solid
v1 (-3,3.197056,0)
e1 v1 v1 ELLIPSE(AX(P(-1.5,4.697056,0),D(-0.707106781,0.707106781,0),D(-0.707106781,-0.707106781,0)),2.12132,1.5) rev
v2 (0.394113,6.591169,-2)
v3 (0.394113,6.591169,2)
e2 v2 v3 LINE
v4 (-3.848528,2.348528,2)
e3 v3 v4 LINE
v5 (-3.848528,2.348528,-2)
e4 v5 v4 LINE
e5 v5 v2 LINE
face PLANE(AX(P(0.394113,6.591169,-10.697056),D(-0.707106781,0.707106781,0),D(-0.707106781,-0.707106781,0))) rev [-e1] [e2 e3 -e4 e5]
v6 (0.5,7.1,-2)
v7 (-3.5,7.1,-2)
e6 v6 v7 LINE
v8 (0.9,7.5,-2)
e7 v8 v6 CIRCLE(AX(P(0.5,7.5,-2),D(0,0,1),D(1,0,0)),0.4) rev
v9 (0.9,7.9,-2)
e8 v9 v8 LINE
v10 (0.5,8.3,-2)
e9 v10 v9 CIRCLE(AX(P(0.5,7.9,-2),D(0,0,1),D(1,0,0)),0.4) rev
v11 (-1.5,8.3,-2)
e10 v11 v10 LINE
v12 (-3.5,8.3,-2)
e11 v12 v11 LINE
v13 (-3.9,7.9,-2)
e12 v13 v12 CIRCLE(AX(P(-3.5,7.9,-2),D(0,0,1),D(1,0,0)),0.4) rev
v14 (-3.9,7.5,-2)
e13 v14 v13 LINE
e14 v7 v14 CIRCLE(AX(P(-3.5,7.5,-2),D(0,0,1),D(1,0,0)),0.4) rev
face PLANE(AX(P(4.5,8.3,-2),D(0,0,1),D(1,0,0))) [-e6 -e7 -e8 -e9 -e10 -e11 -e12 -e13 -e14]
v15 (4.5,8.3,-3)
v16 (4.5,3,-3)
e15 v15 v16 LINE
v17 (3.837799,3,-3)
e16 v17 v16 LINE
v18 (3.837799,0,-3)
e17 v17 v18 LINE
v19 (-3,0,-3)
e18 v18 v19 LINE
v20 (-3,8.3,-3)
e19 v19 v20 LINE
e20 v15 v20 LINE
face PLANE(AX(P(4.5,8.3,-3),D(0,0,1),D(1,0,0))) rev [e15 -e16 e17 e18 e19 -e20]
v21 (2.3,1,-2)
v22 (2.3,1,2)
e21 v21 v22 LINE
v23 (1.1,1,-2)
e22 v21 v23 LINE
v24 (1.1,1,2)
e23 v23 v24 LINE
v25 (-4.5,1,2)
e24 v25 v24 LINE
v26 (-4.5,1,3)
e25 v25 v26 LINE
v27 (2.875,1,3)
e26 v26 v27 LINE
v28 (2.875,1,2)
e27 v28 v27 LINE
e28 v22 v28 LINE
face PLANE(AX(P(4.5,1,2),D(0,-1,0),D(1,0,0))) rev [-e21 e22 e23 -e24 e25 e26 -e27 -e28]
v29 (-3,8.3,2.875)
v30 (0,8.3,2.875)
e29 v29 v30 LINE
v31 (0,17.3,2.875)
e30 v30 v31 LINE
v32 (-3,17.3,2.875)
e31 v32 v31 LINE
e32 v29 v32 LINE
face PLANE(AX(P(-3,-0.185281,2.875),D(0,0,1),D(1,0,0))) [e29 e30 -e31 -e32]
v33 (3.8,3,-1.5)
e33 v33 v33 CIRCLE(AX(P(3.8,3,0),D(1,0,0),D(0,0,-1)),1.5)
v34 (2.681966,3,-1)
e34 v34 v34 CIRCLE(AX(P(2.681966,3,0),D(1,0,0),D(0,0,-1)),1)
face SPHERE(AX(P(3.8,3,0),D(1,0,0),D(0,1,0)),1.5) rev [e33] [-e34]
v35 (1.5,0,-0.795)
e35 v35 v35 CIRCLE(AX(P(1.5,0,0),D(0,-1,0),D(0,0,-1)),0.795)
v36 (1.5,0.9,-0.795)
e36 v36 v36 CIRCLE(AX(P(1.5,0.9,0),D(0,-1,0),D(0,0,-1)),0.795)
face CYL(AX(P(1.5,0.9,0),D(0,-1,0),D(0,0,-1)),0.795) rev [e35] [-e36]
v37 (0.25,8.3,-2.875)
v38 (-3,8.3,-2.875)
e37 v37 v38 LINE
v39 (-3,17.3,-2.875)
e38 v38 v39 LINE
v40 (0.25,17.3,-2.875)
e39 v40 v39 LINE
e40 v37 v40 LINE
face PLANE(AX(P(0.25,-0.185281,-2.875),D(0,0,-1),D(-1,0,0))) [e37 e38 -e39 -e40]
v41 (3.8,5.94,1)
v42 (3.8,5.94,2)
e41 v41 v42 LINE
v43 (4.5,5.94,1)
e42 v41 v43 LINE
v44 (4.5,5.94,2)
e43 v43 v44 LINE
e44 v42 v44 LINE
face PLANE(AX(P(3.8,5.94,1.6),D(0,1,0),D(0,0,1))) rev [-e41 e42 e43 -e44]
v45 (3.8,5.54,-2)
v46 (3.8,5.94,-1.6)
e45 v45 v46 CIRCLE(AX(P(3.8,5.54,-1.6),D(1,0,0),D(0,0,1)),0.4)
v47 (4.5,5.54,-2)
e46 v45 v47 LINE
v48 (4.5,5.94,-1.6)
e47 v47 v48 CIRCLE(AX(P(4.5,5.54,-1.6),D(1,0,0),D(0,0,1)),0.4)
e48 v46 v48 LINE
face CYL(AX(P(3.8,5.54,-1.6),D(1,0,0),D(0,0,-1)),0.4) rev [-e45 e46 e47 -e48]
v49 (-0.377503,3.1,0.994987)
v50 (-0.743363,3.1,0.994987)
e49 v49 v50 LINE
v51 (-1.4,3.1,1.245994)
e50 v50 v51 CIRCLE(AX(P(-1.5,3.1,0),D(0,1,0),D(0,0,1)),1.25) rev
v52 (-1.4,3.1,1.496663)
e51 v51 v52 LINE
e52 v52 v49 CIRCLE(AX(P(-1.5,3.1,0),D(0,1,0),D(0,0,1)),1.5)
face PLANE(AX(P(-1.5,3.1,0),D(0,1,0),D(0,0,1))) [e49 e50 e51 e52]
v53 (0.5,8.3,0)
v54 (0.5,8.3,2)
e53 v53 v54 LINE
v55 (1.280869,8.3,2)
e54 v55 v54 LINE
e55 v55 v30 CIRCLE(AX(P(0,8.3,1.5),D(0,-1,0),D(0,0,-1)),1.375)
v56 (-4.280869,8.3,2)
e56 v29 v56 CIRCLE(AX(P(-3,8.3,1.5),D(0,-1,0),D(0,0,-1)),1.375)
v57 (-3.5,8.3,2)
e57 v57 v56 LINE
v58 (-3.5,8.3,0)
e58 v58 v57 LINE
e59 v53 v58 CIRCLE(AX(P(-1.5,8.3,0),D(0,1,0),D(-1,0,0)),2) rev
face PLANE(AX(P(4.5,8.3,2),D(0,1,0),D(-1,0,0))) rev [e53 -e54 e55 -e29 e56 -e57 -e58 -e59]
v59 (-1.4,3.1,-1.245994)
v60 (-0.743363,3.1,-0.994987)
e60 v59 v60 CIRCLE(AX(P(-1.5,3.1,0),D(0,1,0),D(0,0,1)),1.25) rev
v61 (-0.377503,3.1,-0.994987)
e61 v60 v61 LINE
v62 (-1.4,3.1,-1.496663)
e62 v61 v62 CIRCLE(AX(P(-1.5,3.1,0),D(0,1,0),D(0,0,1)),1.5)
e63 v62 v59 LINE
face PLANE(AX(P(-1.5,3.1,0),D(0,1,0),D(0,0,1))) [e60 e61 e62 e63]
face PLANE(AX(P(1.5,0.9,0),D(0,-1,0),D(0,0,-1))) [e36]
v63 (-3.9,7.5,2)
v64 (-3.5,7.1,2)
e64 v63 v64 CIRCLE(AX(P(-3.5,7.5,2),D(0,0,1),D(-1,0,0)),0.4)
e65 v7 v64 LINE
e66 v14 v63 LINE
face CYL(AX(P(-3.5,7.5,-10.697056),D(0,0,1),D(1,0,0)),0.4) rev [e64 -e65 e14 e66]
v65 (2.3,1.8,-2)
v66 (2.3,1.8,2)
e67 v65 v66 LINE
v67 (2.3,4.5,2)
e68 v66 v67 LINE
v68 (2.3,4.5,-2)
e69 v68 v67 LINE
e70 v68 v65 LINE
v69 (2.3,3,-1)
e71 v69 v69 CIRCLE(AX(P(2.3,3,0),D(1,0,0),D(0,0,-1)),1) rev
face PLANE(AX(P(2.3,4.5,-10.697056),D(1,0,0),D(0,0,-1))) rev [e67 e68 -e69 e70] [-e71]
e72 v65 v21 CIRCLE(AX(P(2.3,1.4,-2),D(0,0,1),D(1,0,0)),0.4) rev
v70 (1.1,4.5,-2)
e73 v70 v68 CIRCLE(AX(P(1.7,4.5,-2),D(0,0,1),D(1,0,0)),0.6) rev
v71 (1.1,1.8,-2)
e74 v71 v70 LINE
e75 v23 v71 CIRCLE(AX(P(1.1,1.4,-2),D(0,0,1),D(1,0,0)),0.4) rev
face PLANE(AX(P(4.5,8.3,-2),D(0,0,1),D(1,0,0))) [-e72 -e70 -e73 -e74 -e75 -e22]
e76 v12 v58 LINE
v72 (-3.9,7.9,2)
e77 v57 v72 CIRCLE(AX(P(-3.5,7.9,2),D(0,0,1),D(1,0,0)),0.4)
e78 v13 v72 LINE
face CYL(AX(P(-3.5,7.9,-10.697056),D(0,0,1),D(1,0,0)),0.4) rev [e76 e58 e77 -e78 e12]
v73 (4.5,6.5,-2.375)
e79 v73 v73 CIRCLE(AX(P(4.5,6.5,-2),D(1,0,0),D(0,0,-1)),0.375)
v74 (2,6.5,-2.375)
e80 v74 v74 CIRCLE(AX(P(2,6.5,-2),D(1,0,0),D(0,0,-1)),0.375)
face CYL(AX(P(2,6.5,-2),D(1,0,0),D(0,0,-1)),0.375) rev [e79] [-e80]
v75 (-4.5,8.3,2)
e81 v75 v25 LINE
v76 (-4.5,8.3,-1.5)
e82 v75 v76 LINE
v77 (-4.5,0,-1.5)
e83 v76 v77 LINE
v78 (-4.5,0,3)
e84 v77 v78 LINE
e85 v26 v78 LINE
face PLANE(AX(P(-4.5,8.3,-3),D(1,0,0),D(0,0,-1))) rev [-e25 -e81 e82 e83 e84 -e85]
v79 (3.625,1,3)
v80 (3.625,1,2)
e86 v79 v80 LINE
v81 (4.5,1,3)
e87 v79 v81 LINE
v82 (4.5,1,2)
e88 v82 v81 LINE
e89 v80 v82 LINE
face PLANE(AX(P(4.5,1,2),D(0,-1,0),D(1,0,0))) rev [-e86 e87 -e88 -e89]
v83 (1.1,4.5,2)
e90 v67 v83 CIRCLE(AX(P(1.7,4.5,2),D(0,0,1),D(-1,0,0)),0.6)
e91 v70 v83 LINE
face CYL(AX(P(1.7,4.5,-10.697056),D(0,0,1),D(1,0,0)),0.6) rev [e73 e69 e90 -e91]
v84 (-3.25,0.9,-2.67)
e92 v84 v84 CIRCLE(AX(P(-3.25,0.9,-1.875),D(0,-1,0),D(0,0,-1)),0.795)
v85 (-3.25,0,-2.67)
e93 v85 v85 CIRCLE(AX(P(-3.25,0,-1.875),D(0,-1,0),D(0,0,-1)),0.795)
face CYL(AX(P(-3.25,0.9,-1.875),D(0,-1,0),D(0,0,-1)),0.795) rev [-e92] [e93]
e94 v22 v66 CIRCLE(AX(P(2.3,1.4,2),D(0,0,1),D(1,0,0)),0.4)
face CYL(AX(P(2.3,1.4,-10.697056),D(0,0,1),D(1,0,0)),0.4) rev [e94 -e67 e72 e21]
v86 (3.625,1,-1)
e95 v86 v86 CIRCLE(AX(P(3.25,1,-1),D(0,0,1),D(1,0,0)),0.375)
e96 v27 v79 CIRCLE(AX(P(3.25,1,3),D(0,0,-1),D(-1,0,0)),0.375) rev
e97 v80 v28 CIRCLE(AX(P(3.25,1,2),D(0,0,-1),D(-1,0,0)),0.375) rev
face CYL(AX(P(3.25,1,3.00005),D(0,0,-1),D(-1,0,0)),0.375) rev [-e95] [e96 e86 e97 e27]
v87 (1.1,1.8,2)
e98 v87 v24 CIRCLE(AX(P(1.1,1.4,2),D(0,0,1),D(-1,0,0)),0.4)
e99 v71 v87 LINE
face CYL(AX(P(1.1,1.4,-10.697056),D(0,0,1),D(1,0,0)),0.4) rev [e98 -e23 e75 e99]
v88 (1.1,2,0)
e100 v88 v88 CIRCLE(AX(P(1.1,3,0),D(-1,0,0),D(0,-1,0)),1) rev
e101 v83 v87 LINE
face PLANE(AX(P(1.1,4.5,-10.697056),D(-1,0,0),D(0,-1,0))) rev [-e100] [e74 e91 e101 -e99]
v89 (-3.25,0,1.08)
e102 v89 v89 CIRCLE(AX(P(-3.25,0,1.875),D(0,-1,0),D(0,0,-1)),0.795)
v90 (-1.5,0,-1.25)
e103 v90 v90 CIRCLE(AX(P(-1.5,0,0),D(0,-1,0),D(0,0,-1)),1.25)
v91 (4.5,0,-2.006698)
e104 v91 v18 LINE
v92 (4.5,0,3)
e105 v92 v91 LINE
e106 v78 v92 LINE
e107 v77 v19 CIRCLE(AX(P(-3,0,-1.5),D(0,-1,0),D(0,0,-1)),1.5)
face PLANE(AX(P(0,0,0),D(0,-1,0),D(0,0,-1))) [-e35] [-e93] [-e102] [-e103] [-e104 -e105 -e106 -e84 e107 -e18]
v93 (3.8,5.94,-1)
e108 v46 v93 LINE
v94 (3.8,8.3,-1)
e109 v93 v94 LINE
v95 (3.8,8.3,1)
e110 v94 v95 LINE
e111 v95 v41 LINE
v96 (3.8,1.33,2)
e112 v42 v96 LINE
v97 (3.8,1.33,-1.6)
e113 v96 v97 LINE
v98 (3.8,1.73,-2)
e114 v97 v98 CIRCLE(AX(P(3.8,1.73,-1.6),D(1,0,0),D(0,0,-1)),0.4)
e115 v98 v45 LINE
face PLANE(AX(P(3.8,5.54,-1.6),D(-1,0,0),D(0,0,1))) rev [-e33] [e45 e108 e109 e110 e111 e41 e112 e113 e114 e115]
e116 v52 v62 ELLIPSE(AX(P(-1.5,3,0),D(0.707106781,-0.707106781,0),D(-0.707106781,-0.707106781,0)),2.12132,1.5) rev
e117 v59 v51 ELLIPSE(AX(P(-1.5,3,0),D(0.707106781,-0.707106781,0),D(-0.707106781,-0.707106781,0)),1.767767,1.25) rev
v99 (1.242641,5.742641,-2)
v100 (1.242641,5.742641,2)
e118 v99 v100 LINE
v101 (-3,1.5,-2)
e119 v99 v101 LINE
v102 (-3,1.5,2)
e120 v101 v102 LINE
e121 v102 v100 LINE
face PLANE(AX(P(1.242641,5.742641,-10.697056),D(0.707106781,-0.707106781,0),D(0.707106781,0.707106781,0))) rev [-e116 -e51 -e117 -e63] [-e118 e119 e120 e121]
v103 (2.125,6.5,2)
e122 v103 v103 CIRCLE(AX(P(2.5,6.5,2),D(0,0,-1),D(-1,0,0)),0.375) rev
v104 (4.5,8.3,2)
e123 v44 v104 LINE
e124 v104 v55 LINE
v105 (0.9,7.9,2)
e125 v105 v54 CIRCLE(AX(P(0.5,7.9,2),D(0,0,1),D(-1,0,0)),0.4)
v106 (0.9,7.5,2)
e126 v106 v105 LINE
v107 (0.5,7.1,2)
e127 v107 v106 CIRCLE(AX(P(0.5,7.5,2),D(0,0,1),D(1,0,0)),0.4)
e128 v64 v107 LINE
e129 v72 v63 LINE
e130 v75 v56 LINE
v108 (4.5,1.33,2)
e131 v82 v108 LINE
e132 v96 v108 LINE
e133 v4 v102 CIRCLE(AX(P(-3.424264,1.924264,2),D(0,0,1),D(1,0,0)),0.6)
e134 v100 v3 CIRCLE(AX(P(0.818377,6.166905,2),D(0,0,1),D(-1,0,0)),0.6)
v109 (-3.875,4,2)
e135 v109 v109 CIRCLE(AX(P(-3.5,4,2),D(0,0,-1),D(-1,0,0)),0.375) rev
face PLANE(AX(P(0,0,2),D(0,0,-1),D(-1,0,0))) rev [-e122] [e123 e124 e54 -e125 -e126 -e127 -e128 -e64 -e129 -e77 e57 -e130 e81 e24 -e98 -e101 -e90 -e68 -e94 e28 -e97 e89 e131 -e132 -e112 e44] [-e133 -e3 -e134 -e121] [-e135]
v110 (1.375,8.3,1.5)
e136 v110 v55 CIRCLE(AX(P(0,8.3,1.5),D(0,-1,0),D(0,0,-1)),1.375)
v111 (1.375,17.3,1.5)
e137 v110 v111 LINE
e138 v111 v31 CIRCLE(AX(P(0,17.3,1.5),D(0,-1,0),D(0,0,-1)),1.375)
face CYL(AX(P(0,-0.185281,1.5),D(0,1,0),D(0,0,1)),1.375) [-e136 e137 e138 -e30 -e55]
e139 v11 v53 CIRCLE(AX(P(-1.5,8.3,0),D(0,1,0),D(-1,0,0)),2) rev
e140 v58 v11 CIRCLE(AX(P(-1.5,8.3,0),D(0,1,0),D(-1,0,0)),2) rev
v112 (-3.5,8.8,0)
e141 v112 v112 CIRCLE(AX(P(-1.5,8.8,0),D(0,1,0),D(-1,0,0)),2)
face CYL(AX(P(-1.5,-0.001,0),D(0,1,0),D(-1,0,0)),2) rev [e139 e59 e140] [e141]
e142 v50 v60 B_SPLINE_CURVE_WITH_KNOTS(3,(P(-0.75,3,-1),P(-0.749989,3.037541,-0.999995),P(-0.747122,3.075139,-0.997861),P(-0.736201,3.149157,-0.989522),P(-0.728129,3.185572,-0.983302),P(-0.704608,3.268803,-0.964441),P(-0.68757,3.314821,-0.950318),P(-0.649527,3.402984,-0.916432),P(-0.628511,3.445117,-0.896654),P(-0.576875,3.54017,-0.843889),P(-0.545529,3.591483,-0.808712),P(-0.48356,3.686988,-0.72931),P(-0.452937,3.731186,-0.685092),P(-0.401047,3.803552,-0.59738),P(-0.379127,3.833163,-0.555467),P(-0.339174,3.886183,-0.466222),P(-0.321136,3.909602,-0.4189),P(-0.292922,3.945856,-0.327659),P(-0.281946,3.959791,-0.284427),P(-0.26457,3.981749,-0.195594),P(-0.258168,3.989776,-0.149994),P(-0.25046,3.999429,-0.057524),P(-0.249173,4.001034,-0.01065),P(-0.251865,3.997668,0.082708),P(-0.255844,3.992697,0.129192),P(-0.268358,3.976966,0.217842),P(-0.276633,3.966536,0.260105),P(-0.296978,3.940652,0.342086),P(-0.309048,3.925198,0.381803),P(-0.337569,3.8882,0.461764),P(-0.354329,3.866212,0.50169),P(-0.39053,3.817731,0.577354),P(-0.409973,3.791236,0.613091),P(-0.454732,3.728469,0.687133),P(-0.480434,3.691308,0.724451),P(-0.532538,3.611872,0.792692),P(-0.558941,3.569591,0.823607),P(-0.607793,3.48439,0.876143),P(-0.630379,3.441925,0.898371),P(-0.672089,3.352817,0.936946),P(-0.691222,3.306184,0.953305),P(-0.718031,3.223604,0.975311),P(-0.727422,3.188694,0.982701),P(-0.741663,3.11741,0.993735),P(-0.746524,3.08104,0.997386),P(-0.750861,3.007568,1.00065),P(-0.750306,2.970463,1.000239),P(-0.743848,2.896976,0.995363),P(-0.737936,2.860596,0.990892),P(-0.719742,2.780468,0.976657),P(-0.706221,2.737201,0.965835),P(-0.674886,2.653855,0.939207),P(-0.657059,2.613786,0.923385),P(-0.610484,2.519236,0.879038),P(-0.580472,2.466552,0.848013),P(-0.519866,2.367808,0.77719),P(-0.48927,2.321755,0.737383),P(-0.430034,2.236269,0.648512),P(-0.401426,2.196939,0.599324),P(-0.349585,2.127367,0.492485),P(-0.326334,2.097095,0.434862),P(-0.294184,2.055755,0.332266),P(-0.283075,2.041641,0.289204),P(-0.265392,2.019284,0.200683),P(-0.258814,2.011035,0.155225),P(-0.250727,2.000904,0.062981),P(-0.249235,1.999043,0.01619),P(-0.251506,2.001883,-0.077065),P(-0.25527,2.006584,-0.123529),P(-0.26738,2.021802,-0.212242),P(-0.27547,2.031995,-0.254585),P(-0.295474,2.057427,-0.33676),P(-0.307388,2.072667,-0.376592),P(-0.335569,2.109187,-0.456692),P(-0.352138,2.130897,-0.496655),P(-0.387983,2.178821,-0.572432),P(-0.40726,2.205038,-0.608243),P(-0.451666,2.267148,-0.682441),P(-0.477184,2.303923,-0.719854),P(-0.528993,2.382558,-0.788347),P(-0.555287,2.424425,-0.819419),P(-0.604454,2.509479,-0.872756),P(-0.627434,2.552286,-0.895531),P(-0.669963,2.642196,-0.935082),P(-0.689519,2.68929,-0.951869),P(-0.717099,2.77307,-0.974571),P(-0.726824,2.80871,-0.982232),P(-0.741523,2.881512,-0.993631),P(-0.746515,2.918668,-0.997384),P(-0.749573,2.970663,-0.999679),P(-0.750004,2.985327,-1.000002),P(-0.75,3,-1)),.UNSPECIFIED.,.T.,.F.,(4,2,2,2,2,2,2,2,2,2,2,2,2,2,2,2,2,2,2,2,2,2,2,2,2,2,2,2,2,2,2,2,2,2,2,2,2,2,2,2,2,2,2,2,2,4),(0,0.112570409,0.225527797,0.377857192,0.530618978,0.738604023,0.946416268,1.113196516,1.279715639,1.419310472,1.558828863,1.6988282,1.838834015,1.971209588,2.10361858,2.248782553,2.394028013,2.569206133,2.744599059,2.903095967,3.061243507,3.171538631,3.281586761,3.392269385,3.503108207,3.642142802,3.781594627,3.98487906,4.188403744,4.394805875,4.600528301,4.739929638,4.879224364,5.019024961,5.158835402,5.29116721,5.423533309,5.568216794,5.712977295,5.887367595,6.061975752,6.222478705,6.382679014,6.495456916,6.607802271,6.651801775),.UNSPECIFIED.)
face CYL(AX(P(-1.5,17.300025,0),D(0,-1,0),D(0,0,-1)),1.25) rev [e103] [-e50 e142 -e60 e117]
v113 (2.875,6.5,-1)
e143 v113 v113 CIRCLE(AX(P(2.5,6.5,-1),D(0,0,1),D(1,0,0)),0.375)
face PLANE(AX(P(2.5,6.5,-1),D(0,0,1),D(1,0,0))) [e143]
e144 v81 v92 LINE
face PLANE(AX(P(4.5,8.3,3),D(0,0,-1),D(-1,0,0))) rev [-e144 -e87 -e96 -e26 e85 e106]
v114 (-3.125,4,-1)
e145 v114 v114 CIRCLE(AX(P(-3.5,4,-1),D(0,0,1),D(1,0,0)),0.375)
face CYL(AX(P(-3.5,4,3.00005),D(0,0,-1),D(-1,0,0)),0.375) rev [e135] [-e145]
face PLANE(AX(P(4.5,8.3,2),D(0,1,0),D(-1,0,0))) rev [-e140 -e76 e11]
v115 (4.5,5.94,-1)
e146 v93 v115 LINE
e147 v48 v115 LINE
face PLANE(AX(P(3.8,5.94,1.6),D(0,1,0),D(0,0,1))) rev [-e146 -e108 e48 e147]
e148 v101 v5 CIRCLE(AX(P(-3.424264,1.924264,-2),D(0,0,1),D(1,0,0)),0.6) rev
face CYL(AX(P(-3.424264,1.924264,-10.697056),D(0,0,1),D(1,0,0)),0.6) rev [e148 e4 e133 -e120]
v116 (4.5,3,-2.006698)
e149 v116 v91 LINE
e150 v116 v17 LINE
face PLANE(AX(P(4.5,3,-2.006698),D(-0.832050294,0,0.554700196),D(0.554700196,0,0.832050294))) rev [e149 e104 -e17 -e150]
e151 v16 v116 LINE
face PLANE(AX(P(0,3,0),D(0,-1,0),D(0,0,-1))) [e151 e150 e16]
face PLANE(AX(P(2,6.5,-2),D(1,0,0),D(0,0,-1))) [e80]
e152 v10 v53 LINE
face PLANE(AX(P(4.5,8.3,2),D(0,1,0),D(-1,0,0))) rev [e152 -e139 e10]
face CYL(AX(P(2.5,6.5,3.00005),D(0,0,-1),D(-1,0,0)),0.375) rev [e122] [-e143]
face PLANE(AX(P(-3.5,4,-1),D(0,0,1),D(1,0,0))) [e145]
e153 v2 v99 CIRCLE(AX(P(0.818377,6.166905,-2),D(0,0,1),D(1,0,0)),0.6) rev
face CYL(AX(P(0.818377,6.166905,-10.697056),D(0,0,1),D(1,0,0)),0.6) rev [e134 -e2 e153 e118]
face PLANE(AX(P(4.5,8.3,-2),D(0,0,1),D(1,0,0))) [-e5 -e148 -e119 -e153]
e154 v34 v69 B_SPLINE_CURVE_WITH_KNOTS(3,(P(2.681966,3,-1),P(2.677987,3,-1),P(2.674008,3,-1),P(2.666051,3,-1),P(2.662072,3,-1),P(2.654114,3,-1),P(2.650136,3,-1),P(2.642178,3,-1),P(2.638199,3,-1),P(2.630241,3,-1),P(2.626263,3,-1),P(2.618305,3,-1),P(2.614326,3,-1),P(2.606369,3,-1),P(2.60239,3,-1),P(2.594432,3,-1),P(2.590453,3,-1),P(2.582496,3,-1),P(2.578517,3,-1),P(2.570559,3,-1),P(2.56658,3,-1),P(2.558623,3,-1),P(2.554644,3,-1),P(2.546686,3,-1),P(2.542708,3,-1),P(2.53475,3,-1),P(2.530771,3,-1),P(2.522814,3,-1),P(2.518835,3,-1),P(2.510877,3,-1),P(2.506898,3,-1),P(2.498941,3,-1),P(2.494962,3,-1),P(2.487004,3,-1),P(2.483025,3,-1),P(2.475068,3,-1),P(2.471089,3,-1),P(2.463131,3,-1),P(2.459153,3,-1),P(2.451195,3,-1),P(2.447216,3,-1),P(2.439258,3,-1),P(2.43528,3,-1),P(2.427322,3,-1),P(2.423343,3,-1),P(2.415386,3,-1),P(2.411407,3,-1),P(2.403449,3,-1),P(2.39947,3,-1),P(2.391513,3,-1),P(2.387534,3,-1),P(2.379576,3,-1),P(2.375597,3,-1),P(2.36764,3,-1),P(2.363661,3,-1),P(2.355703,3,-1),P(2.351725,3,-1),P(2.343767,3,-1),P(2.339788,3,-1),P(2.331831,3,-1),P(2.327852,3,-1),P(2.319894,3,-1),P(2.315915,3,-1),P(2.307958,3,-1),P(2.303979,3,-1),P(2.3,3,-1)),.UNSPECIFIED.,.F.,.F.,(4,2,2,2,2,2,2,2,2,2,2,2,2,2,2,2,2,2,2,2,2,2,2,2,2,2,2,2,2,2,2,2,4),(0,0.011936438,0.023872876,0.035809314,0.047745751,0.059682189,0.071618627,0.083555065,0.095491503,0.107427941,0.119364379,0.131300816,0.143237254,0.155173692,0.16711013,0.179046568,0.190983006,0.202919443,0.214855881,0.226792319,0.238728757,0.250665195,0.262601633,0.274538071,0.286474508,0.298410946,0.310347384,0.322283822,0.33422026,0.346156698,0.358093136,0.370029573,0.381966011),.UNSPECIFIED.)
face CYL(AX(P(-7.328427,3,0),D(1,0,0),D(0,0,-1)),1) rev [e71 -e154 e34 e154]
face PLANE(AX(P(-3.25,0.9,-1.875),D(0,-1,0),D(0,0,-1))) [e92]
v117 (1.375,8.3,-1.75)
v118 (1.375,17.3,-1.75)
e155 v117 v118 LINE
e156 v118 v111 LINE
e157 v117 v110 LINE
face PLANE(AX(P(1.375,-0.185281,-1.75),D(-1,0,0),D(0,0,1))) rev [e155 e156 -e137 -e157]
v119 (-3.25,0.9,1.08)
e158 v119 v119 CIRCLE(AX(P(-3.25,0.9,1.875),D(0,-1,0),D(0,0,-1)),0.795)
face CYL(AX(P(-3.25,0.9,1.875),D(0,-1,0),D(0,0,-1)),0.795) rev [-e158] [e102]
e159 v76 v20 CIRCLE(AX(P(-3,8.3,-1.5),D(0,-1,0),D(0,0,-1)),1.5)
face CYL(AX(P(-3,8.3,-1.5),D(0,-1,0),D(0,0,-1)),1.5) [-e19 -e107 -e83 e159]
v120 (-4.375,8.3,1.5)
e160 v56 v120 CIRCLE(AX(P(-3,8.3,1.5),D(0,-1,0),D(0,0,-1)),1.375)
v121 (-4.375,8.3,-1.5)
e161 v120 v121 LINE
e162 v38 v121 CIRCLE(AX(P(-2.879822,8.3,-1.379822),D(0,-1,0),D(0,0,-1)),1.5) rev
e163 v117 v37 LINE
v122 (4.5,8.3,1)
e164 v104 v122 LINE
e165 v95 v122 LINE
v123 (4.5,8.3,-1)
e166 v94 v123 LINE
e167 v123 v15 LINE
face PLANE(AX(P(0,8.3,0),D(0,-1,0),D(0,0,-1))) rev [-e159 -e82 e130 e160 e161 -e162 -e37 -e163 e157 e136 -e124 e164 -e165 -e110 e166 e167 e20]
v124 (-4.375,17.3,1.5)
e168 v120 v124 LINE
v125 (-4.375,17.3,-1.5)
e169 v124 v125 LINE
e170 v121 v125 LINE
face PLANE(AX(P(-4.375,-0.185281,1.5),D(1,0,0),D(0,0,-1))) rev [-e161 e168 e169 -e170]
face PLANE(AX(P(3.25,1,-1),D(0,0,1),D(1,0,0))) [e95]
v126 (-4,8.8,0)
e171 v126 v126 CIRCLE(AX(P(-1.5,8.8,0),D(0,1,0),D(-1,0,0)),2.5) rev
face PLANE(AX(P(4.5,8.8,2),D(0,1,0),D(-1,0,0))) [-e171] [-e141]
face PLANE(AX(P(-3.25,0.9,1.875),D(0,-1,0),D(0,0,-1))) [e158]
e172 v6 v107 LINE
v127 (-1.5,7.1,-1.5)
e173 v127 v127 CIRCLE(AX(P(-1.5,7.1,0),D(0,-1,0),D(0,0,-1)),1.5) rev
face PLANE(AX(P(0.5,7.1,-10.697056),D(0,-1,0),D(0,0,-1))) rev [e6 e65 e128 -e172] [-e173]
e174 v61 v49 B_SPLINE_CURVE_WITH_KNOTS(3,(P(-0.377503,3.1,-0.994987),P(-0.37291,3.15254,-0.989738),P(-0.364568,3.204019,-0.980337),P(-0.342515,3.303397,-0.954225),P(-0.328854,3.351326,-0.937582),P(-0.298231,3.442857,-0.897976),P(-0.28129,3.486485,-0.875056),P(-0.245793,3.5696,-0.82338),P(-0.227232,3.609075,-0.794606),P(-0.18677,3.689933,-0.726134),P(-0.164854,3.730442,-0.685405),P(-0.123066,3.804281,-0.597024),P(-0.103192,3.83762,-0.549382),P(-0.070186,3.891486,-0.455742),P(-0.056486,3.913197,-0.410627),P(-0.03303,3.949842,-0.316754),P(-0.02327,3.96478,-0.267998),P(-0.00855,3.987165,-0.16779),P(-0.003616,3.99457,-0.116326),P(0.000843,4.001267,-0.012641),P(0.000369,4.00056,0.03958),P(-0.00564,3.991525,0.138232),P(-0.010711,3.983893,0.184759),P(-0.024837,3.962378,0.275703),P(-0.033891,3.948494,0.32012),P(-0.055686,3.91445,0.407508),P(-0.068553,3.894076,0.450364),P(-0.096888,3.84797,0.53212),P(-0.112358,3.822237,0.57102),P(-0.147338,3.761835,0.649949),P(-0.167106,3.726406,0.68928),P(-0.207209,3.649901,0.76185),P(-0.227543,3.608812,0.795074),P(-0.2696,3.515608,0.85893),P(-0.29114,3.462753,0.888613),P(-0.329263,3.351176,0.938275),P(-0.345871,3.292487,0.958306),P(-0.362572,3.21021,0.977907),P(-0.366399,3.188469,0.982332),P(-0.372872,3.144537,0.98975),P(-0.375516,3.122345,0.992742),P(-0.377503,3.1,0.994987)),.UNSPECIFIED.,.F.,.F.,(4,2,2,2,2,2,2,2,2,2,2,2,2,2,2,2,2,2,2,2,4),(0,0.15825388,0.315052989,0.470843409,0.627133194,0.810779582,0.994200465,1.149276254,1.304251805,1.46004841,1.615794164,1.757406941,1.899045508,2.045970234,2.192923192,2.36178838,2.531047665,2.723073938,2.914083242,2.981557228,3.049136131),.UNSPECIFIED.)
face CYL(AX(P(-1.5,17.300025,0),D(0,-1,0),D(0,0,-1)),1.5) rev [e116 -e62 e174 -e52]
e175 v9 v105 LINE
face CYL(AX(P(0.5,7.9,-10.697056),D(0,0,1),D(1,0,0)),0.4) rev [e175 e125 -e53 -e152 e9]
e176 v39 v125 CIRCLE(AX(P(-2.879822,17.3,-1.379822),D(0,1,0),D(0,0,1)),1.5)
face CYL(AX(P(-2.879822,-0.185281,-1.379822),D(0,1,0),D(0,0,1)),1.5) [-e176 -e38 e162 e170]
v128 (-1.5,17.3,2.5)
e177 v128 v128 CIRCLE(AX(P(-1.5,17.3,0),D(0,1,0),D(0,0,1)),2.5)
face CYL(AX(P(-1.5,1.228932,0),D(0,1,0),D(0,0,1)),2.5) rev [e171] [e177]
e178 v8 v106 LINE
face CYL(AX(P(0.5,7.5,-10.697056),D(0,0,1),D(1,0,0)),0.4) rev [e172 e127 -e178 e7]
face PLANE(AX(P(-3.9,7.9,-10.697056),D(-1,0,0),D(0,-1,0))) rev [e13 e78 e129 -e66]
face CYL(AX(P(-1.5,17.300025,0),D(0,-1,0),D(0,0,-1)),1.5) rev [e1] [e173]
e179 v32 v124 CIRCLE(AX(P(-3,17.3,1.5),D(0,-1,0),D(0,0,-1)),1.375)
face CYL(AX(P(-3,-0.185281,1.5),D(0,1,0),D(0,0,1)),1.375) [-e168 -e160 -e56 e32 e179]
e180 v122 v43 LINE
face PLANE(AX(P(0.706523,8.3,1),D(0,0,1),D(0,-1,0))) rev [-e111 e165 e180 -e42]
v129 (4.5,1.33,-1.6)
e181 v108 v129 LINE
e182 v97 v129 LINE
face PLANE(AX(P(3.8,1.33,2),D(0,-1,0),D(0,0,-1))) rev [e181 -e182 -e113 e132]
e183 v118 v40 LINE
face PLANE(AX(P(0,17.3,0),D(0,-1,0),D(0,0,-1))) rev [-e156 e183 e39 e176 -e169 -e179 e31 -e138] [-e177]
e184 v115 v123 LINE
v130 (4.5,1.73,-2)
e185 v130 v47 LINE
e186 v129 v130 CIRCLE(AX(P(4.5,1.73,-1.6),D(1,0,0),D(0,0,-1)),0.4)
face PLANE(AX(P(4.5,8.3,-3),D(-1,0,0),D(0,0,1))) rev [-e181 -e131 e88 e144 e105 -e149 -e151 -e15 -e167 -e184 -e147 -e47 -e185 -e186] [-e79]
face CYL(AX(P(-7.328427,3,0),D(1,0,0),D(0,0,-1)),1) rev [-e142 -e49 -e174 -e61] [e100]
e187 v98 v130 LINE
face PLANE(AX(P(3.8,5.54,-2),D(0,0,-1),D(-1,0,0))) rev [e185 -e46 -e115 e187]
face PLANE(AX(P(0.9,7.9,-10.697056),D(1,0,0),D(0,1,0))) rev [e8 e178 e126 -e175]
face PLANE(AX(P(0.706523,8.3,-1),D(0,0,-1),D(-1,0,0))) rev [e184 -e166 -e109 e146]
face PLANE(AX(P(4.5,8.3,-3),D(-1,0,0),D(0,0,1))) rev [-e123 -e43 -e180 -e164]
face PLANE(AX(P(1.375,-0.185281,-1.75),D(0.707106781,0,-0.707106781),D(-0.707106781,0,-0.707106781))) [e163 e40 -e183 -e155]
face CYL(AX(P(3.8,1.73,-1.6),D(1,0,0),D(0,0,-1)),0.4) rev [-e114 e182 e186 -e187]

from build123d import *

# Parameters (mm, degrees)
SKETCH1_W                   = 9
SKETCH1_H                   = 6
MAIN_BODY_EXT_DEPTH         = 8.3
EMISSION_PATH_EXT_DEPTH     = 9
SKETCH3_R                   = 1.25
EMISSION_AND_GRIN_CUT_DEPTH = 19.125672401
SKETCH4_R                   = 1
DRUM_LENS_CUT_DEPTH         = 7
SKETCH5_W                   = 9
SKETCH5_H                   = 7.3
FILTERSET_CUT1_DEPTH        = 1
FILTERSET_CUT2_DEPTH        = 4
SKETCH10_R                  = 2.5
EMISSION_LENS_CUT_DEPTH     = 8.5
SKETCH15_R                  = 0.795
MAGNETS_CUT_DEPTH           = 0.9
SCREW_HOLES_CUT_DEPTH       = 19.561788707
SCREW_HOLES_CUT_DEPTH_BACK  = 3
SKETCH18_R                  = 0.375
EXTERNAL_FILLET_1_R         = 1.5
CUT_EXTRUDE8_DEPTH          = 12.545128843
CUT_EXTRUDE8_DEPTH_BACK     = 4
SKETCH28_R                  = 1.5
CUT_EXTRUDE9_DEPTH          = 3
CUT_EXTRUDE10_DEPTH         = 0.7
SKETCH29_R                  = 0.375
CUT_EXTRUDE11_DEPTH         = 2.5
SKETCH32_W                  = 2
SKETCH32_H                  = 2.36
CUT_EXTRUDE14_DEPTH         = 0.7
CUT_EXTRUDE16_DEPTH         = 9
CUT_EXTRUDE17_REACH         = 12.329
SKETCH37_R                  = 2
CUT_EXTRUDE18_START         = -9
CUT_EXTRUDE18_DEPTH         = 9


with BuildPart() as part:
    # Sketch1 → Main Body Ext (new body)
    with BuildSketch(Plane(origin=(0, 0, 0), x_dir=(1, 0, 0), z_dir=(0, 1, 0))):
        Rectangle(SKETCH1_W, SKETCH1_H)
    extrude(amount=MAIN_BODY_EXT_DEPTH)

    # Sketch8 → Emission Path Ext (add)
    with BuildSketch(Plane(origin=(0, 8.3, 0), x_dir=(1, 0, 0), z_dir=(0, 1, 0))):
        Polygon((0.25, 3), (1.5, 1.75), (1.5, -3), (-4.5, -3), (-4.5, 3), align=None)
    extrude(amount=EMISSION_PATH_EXT_DEPTH)

    # Sketch3 → Emission and Grin Cut (cut, through all)
    with BuildSketch(Plane.XZ):
        with Locations(Location((-1.5, 0, 0), (0, 0, 270))):
            Circle(SKETCH3_R)
    extrude(amount=-EMISSION_AND_GRIN_CUT_DEPTH, mode=Mode.SUBTRACT)

    # Sketch4 → Drum Lens Cut (cut)
    with BuildSketch(Plane(origin=(4.5, 0, 0), x_dir=(0, 0, -1), z_dir=(1, 0, 0))):
        with Locations((0, 3)):
            Circle(SKETCH4_R)
    extrude(amount=-DRUM_LENS_CUT_DEPTH, mode=Mode.SUBTRACT)

    # Sketch5 → FilterSet Cut1 (cut)
    with BuildSketch(Plane.XY.offset(3)):
        with Locations((0, 4.65)):
            Rectangle(SKETCH5_W, SKETCH5_H)
    extrude(amount=-FILTERSET_CUT1_DEPTH, mode=Mode.SUBTRACT)

    # Sketch6 → FilterSet Cut2 (cut)
    with BuildSketch(Plane.XY.offset(2)):
        with BuildLine():
            Line((2.3, 4.5), (2.3, 1.8))
            ThreePointArc((2.3, 1.8), (2.7, 1.4), (2.3, 1))
            Line((2.3, 1), (1.1, 1))
            ThreePointArc((1.1, 1), (0.7, 1.4), (1.1, 1.8))
            Line((1.1, 1.8), (1.1, 4.5))
            ThreePointArc((1.1, 4.5), (1.7, 5.1), (2.3, 4.5))
        make_face()
        with BuildLine():
            Line((-3.9, 7.9), (-3.9, 7.5))
            ThreePointArc((-3.9, 7.5), (-3.782842712, 7.217157288), (-3.5, 7.1))
            Line((-3.5, 7.1), (0.5, 7.1))
            ThreePointArc((0.5, 7.1), (0.782842712, 7.217157288), (0.9, 7.5))
            Line((0.9, 7.5), (0.9, 7.9))
            ThreePointArc((0.9, 7.9), (0.782842712, 8.182842712), (0.5, 8.3))
            Line((0.5, 8.3), (-3.5, 8.3))
            ThreePointArc((-3.5, 8.3), (-3.782842712, 8.182842712), (-3.9, 7.9))
        make_face()
        with BuildLine():
            Line((0.39411255, 6.591168825), (-3.848528137, 2.348528137))
            ThreePointArc((-3.848528137, 2.348528137), (-3.848528137, 1.5), (-3, 1.5))
            Line((-3, 1.5), (1.242640687, 5.742640687))
            ThreePointArc((1.242640687, 5.742640687), (1.242640687, 6.591168825), (0.39411255, 6.591168825))
        make_face()
    extrude(amount=-FILTERSET_CUT2_DEPTH, mode=Mode.SUBTRACT)

    # Sketch10 → Emission Lens Cut (cut)
    with BuildSketch(Plane(origin=(0, 17.3, 0), x_dir=(1, 0, 0), z_dir=(0, 1, 0))):
        with Locations(Location((-1.5, 0, 0), (0, 0, 270))):
            Circle(SKETCH10_R)
    extrude(amount=-EMISSION_LENS_CUT_DEPTH, mode=Mode.SUBTRACT)

    # Sketch15 → Magnets Cut (cut)
    with BuildSketch(Plane.XZ):
        with Locations(Location((-3.25, -1.875, 0), (0, 0, 270))):
            Circle(SKETCH15_R)
        with Locations(Location((-3.25, 1.875, 0), (0, 0, 270))):
            Circle(SKETCH15_R)
        with Locations(Location((1.5, 0, 0), (0, 0, 270))):
            Circle(SKETCH15_R)
    extrude(amount=-MAGNETS_CUT_DEPTH, mode=Mode.SUBTRACT)

    # Sketch18 → Screw Holes Cut (cut, two sides: drawn at the far end of the back side and taken through both)
    with BuildSketch(Plane.XY.offset(2).offset(-SCREW_HOLES_CUT_DEPTH_BACK)):
        with Locations(Location((-3.5, 4, 0), (0, 0, 180))):
            Circle(SKETCH18_R)
        with Locations(Location((2.5, 6.5, 0), (0, 0, 180))):
            Circle(SKETCH18_R)
        with Locations((3.25, 1)):
            Circle(SKETCH18_R)
    extrude(amount=SCREW_HOLES_CUT_DEPTH + SCREW_HOLES_CUT_DEPTH_BACK, mode=Mode.SUBTRACT)

    # External Fillet 1
    # the kernel refuses this fillet: 1.5 mm, written as the material it takes off along each edge
    with BuildSketch(Plane(origin=(-4.5, -3.75, -3), x_dir=(1, 0, 0), z_dir=(0, 1, 0))) as external_fillet_1_piece_1:
        with BuildLine():
            CenterArc((EXTERNAL_FILLET_1_R, -EXTERNAL_FILLET_1_R), EXTERNAL_FILLET_1_R, 90, 90)
            Line((0, -EXTERNAL_FILLET_1_R), (0, 0))
            Line((0, 0), (EXTERNAL_FILLET_1_R, 0))
        make_face()
    extrude(amount=24.8, mode=Mode.SUBTRACT)
    with BuildSketch(Plane(origin=(1.5, 8.3, 3), x_dir=(0, 0, -1), z_dir=(0, 1, 0))) as external_fillet_1_piece_2:
        with BuildLine():
            CenterArc((EXTERNAL_FILLET_1_R, EXTERNAL_FILLET_1_R), EXTERNAL_FILLET_1_R, 180, 90)
            Line((0, EXTERNAL_FILLET_1_R), (0, 0))
            Line((0, 0), (EXTERNAL_FILLET_1_R, 0))
        make_face()
    extrude(amount=12.75, mode=Mode.SUBTRACT)

    # Sketch28 → Cut-Extrude8 (cut, two sides: drawn at the far end of the back side and taken through both)
    with BuildSketch(Plane(origin=(0, 7.1, 0), x_dir=(1, 0, 0), z_dir=(0, 1, 0)).offset(-CUT_EXTRUDE8_DEPTH_BACK)):
        with Locations(Location((-1.5, 0, 0), (0, 0, 180))):
            Circle(SKETCH28_R)
    extrude(amount=CUT_EXTRUDE8_DEPTH + CUT_EXTRUDE8_DEPTH_BACK, mode=Mode.SUBTRACT)

    # Sketch14 → Cut-Extrude9 (cut)
    with BuildSketch(Plane.XZ):
        Polygon((4.5, -3), (4.5, -2.006698359), (3.837798906, -3), align=None)
    extrude(amount=-CUT_EXTRUDE9_DEPTH, mode=Mode.SUBTRACT)

    # Sketch12 → Cut-Extrude10 (cut)
    with BuildSketch(Plane(origin=(4.5, 0, 0), x_dir=(0, 0, -1), z_dir=(1, 0, 0))):
        with BuildLine():
            Line((1.6, 5.94), (-1.6, 5.94))
            Line((-1.6, 5.94), (-2, 5.94))
            Line((-2, 5.94), (-2, 1.33))
            Line((-2, 1.33), (1.6, 1.33))
            ThreePointArc((1.6, 1.33), (1.882842712, 1.447157288), (2, 1.73))
            Line((2, 1.73), (2, 5.54))
            ThreePointArc((2, 5.54), (1.882842712, 5.822842712), (1.6, 5.94))
        make_face()
    extrude(amount=-CUT_EXTRUDE10_DEPTH, mode=Mode.SUBTRACT)

    # Sketch29 → Cut-Extrude11 (cut)
    with BuildSketch(Plane(origin=(4.5, 0, 0), x_dir=(0, 0, -1), z_dir=(1, 0, 0))):
        with Locations((2, 6.5)):
            Circle(SKETCH29_R)
    extrude(amount=-CUT_EXTRUDE11_DEPTH, mode=Mode.SUBTRACT)

    # Sketch32 → Cut-Extrude14 (cut)
    with BuildSketch(Plane(origin=(4.5, 0, 0), x_dir=(0, 0, -1), z_dir=(1, 0, 0))):
        with Locations((0, 7.12)):
            Rectangle(SKETCH32_W, SKETCH32_H)
    extrude(amount=-CUT_EXTRUDE14_DEPTH, mode=Mode.SUBTRACT)

    # Sketch33 → Cut-Revolve1 (revolve, cut)
    with BuildSketch(Plane.XY, mode=Mode.PRIVATE) as cut_revolve1_sk:
        with BuildLine():
            Line((3.8, 3), (2.3, 3))
            ThreePointArc((2.3, 3), (2.739339828, 4.060660172), (3.8, 4.5))
            Line((3.8, 4.5), (3.8, 3))
        make_face()
    revolve(cut_revolve1_sk.sketch.rotate(Axis((3.8, 3, 0), (-1, 0, 0)), 90), axis=Axis((3.8, 3, 0), (-1, 0, 0)), mode=Mode.SUBTRACT)

    # Sketch36 → Cut-Extrude16 (cut)
    with BuildSketch(Plane(origin=(0, 17.3, 0), x_dir=(1, 0, 0), z_dir=(0, 1, 0))):
        with BuildLine():
            Line((-4.5, -1.5), (-4.5, -3))
            Line((-4.5, -3), (-3, -3))
            ThreePointArc((-3, -3), (-4.060660172, -2.560660172), (-4.5, -1.5))
        make_face()
    extrude(amount=-CUT_EXTRUDE16_DEPTH, mode=Mode.SUBTRACT)

    # Sketch37 → Cut-Extrude17 (cut, up to next)
    with BuildSketch(Plane(origin=(0, 8.8, 0), x_dir=(1, 0, 0), z_dir=(0, 1, 0)), mode=Mode.PRIVATE) as cut_extrude17_sk1:
        with Locations(Location((-1.5, 0, 0), (0, 0, 180))):
            Circle(SKETCH37_R)
    cut_extrude17_tool1 = extrude(cut_extrude17_sk1.sketch, amount=-CUT_EXTRUDE17_REACH, mode=Mode.PRIVATE) & part.part
    add(cut_extrude17_tool1.solids().sort_by_distance((-1.5, 8.8, 0))[0], mode=Mode.SUBTRACT)

    # Sketch38 → Cut-Extrude18 (cut)
    with BuildSketch(Plane(origin=(0, 17.3, 0), x_dir=(1, 0, 0), z_dir=(0, 1, 0)).offset(CUT_EXTRUDE18_START)):
        with BuildLine():
            Line((-3, 3), (0.25, 3))
            Line((0.25, 3), (1.5, 1.75))
            Line((1.5, 1.75), (1.5, -1.5))
            ThreePointArc((1.5, -1.5), (1.060660172, -2.560660172), (0, -3))
            Line((0, -3), (-3, -3))
            ThreePointArc((-3, -3), (-4.060660172, -2.560660172), (-4.5, -1.5))
            Line((-4.5, -1.5), (-4.5, 1.5))
            ThreePointArc((-4.5, 1.5), (-4.060660172, 2.560660172), (-3, 3))
        make_face()
        with BuildLine():
            Line((-4.375, -1.5), (-4.375, 1.5))
            ThreePointArc((-4.375, 1.5), (-3.940482173, 2.440482173), (-3, 2.875))
            Line((-3, 2.875), (0.25, 2.875))
            Line((0.25, 2.875), (1.375, 1.75))
            Line((1.375, 1.75), (1.375, -1.5))
            ThreePointArc((1.375, -1.5), (0.972271824, -2.472271824), (0, -2.875))
            Line((0, -2.875), (-3, -2.875))
            ThreePointArc((-3, -2.875), (-3.972271824, -2.472271824), (-4.375, -1.5))
        make_face(mode=Mode.SUBTRACT)
    extrude(amount=CUT_EXTRUDE18_DEPTH, mode=Mode.SUBTRACT)


solid = part.part
